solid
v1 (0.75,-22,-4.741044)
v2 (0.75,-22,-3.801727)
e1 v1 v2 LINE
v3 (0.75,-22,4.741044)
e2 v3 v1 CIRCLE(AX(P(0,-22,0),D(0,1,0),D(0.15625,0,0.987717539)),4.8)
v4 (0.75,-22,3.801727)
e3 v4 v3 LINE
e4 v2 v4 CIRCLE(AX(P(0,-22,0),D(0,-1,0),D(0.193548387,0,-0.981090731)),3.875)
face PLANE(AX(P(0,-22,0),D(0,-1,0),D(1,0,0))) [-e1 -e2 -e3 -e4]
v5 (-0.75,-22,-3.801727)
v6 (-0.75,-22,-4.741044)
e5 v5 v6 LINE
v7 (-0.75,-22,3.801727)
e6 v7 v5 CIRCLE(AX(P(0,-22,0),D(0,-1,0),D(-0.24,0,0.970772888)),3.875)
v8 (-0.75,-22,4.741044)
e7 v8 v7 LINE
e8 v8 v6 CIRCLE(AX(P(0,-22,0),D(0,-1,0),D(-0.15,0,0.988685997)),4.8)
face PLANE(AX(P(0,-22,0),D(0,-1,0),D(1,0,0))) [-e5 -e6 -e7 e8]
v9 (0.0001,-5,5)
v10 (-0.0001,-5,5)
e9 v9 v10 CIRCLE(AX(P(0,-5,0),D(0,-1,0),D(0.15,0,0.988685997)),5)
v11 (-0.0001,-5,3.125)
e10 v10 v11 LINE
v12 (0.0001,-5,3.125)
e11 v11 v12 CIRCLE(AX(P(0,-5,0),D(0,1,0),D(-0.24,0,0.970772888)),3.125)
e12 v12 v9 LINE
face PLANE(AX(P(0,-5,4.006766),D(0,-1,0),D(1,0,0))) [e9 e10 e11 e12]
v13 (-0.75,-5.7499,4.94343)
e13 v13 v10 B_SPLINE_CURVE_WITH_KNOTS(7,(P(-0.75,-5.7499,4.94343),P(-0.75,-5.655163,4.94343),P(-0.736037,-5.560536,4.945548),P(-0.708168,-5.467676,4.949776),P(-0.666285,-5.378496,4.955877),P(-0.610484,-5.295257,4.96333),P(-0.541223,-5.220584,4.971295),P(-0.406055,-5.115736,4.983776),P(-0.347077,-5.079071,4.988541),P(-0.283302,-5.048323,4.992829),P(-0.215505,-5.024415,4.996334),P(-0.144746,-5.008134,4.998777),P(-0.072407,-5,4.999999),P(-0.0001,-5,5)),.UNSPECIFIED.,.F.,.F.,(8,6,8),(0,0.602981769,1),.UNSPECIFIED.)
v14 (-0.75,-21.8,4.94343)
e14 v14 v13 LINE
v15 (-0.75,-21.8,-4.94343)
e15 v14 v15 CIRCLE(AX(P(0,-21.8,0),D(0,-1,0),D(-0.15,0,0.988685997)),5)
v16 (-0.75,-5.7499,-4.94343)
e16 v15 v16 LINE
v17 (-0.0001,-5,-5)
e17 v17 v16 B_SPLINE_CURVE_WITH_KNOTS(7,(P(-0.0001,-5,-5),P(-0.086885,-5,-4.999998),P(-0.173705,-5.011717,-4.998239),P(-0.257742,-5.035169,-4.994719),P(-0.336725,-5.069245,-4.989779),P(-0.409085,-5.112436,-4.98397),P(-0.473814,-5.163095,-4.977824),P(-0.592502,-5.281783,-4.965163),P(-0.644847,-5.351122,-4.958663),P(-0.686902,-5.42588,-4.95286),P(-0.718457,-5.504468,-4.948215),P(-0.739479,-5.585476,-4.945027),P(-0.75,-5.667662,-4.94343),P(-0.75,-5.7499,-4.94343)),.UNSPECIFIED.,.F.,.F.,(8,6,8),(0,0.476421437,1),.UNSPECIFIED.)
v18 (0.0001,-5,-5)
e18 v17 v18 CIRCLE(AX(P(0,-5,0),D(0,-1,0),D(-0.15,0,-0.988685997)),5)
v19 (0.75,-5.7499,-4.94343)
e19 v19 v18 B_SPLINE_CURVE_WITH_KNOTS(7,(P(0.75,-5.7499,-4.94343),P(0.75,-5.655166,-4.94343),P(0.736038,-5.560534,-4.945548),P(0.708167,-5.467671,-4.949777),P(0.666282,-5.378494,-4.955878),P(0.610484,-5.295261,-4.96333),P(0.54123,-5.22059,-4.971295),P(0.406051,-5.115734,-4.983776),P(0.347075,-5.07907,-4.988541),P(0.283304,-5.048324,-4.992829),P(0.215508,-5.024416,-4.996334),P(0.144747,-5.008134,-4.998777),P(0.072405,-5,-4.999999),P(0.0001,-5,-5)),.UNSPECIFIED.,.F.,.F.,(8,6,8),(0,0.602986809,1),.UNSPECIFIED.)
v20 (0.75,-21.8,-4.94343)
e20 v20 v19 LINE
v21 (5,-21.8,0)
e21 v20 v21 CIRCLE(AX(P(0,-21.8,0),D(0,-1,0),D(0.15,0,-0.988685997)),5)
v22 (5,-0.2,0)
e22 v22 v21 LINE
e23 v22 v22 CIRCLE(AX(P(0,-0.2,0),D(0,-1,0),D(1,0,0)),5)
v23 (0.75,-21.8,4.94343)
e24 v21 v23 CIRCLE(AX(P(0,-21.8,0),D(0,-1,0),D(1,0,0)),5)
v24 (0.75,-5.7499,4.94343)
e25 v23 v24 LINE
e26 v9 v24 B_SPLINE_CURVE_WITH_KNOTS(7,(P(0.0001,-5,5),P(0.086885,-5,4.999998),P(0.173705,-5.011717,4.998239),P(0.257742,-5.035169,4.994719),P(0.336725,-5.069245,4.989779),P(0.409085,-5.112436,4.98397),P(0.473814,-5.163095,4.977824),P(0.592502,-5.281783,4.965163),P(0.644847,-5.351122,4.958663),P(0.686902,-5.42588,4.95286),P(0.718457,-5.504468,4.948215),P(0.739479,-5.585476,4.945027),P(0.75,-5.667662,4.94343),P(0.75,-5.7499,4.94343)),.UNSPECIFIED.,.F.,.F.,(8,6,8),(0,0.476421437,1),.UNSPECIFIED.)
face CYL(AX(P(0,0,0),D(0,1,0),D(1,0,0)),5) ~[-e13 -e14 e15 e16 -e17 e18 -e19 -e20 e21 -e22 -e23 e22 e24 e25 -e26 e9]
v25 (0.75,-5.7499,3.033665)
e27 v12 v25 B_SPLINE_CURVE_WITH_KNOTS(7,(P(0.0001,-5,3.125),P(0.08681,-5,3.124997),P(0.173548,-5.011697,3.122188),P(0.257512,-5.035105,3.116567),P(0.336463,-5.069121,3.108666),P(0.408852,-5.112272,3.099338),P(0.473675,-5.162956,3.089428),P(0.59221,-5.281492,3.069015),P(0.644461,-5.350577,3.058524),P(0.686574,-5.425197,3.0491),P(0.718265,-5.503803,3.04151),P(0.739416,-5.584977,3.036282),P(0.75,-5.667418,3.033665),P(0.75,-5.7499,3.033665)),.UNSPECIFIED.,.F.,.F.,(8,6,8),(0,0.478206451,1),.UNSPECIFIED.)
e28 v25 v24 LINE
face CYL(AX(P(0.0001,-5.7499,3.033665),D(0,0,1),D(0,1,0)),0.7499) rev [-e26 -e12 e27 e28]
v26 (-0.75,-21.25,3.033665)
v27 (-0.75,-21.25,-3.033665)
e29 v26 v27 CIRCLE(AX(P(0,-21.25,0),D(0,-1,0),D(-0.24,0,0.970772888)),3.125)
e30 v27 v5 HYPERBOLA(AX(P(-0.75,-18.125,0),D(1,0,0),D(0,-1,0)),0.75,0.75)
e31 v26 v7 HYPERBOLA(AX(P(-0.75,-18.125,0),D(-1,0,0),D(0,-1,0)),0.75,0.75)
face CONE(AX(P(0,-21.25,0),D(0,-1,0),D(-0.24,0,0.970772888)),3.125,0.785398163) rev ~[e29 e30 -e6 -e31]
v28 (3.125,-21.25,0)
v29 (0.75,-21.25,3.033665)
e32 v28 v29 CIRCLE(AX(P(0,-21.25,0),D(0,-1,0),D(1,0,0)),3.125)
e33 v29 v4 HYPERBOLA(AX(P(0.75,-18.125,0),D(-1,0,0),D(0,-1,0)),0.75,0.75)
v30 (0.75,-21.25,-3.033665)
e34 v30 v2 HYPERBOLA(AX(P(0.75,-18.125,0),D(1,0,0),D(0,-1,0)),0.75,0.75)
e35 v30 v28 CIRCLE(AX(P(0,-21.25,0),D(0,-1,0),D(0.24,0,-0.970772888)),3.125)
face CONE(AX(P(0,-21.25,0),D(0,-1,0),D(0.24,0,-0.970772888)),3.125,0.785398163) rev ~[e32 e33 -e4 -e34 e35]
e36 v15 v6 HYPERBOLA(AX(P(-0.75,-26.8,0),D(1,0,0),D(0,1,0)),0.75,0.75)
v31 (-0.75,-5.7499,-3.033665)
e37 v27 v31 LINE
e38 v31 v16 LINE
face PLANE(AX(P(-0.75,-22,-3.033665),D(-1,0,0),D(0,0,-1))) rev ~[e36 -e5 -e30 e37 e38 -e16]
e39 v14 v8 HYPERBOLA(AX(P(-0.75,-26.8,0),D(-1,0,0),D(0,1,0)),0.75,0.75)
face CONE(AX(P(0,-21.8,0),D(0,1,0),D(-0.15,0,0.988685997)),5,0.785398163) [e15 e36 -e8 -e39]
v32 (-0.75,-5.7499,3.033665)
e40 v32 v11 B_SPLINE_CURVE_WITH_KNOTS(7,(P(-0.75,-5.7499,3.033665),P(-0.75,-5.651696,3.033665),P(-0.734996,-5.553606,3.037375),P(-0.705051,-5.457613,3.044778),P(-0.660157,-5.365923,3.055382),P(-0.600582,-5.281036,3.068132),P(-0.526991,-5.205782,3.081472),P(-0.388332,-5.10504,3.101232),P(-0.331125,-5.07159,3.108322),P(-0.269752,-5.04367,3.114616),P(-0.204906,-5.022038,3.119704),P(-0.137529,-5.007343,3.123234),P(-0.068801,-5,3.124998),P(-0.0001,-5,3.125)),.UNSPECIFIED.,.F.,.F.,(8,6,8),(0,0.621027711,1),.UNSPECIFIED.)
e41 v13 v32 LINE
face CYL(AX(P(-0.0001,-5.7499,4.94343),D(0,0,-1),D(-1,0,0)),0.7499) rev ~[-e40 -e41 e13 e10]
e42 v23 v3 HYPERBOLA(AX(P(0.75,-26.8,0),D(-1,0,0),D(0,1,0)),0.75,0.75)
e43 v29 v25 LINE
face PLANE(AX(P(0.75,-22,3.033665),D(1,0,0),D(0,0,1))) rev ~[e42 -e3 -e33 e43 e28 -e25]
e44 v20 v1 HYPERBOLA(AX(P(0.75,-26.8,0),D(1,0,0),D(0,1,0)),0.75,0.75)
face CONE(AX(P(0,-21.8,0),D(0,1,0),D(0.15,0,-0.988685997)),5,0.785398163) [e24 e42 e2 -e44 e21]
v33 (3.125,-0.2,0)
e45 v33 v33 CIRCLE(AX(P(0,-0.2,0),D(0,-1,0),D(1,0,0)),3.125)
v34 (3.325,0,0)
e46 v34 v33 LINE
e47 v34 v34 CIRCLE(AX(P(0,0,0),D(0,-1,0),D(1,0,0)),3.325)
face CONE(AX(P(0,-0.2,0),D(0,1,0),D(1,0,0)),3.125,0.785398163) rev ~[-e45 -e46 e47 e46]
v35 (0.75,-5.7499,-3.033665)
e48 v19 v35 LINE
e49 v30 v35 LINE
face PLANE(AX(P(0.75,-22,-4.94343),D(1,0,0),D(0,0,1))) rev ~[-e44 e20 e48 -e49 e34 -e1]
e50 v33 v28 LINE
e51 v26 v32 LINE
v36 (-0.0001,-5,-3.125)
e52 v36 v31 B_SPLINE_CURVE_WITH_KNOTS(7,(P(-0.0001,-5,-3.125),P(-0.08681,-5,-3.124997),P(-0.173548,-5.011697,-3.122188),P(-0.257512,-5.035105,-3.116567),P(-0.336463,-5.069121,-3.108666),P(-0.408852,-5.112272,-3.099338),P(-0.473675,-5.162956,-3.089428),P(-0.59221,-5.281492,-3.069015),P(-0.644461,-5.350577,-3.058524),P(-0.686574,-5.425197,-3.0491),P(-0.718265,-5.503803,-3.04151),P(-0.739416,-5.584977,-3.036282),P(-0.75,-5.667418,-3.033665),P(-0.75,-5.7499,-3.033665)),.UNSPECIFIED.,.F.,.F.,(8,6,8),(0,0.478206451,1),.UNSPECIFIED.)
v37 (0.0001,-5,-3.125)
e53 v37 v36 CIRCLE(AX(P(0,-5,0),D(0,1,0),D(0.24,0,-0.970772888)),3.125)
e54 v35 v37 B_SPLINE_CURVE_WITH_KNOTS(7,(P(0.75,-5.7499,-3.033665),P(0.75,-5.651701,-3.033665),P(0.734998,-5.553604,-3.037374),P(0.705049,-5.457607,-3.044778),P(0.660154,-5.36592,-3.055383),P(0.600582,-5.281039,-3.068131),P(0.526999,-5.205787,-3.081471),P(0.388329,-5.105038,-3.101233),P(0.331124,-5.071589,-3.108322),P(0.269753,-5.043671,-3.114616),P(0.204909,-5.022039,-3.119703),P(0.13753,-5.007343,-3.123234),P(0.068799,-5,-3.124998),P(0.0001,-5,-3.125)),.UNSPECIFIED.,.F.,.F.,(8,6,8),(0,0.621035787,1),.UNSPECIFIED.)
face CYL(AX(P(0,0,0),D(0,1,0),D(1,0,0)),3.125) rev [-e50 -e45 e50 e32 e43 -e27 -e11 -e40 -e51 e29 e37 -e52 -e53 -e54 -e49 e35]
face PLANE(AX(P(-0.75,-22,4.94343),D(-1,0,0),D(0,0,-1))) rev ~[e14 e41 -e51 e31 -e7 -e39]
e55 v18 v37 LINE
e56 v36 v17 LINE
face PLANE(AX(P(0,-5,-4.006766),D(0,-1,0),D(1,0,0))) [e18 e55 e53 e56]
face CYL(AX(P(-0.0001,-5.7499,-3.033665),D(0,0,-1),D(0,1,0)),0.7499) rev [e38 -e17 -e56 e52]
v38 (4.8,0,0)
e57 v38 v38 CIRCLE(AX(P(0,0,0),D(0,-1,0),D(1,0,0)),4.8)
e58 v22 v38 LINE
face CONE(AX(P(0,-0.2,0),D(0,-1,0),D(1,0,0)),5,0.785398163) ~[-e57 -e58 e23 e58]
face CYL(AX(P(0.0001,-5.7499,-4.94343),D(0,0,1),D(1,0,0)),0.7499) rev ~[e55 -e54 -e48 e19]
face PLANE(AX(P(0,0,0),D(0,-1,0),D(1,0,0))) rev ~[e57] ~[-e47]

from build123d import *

# Parameters (mm, degrees)
F0_R     = 5
F0_R_2   = 3.125
F1_DEPTH = 22
F3_DEPTH = 17
F4_SIZE  = 0.2
F5_SIZE  = 0.75
F6_R     = 0.7499


# Not quite as in the source:
# - a fillet or chamfer is up to 0.001 mm smaller than in the source, because OpenCascade refuses the exact size


with BuildPart() as f1:
    # F0 (on Front) → F1 (new body)
    with BuildSketch(Plane.XZ):
        Circle(F0_R)
        Circle(F0_R_2, mode=Mode.SUBTRACT)
    extrude(amount=F1_DEPTH)

    # F2 (on face) → F3 (cut)
    with BuildSketch(Plane.XZ.offset(22)):
        with BuildLine():
            ThreePointArc((0.75, 4.9434299833), (0, 5), (-0.75, 4.9434299833))
            Line((-0.75, 4.9434299833), (-0.75, 3.0336652749))
            ThreePointArc((-0.75, 3.0336652749), (0, 3.125), (0.75, 3.0336652749))
            Line((0.75, 3.0336652749), (0.75, 4.9434299833))
        make_face()
        with BuildLine():
            ThreePointArc((-0.75, -4.9434299833), (0, -5), (0.75, -4.9434299833))
            Line((0.75, -4.9434299833), (0.75, -3.0336652749))
            ThreePointArc((0.75, -3.0336652749), (0, -3.125), (-0.75, -3.0336652749))
            Line((-0.75, -3.0336652749), (-0.75, -4.9434299833))
        make_face()
    extrude(amount=-F3_DEPTH, mode=Mode.SUBTRACT)

    # F4
    f4_edges = [f1.edges().sort_by_distance(p)[0] for p in [
        (-5, 0, 0),
        (-5, -22, 0),
        (3.791438, -22, -3.259601),
        (-3.125, 0, 0),
    ]]
    chamfer(f4_edges, length=F4_SIZE)

    # F5
    f5_edges = [f1.edges().sort_by_distance(p)[0] for p in [
        (-3.125, -22, 0),
        (2.460627, -22, -1.926379),
    ]]
    chamfer(f5_edges, length=F5_SIZE)

    # F6 (radius 0.75 in the source; OpenCascade refuses exactly that, so slightly less here)
    f6_edges = [f1.edges().sort_by_distance(p)[0] for p in [
        (0.75, -5, -3.988548),
        (-0.75, -5, 3.988548),
        (-0.75, -5, -3.988548),
        (0.75, -5, 3.988548),
    ]]
    fillet(f6_edges, radius=F6_R)


solid = f1.part
